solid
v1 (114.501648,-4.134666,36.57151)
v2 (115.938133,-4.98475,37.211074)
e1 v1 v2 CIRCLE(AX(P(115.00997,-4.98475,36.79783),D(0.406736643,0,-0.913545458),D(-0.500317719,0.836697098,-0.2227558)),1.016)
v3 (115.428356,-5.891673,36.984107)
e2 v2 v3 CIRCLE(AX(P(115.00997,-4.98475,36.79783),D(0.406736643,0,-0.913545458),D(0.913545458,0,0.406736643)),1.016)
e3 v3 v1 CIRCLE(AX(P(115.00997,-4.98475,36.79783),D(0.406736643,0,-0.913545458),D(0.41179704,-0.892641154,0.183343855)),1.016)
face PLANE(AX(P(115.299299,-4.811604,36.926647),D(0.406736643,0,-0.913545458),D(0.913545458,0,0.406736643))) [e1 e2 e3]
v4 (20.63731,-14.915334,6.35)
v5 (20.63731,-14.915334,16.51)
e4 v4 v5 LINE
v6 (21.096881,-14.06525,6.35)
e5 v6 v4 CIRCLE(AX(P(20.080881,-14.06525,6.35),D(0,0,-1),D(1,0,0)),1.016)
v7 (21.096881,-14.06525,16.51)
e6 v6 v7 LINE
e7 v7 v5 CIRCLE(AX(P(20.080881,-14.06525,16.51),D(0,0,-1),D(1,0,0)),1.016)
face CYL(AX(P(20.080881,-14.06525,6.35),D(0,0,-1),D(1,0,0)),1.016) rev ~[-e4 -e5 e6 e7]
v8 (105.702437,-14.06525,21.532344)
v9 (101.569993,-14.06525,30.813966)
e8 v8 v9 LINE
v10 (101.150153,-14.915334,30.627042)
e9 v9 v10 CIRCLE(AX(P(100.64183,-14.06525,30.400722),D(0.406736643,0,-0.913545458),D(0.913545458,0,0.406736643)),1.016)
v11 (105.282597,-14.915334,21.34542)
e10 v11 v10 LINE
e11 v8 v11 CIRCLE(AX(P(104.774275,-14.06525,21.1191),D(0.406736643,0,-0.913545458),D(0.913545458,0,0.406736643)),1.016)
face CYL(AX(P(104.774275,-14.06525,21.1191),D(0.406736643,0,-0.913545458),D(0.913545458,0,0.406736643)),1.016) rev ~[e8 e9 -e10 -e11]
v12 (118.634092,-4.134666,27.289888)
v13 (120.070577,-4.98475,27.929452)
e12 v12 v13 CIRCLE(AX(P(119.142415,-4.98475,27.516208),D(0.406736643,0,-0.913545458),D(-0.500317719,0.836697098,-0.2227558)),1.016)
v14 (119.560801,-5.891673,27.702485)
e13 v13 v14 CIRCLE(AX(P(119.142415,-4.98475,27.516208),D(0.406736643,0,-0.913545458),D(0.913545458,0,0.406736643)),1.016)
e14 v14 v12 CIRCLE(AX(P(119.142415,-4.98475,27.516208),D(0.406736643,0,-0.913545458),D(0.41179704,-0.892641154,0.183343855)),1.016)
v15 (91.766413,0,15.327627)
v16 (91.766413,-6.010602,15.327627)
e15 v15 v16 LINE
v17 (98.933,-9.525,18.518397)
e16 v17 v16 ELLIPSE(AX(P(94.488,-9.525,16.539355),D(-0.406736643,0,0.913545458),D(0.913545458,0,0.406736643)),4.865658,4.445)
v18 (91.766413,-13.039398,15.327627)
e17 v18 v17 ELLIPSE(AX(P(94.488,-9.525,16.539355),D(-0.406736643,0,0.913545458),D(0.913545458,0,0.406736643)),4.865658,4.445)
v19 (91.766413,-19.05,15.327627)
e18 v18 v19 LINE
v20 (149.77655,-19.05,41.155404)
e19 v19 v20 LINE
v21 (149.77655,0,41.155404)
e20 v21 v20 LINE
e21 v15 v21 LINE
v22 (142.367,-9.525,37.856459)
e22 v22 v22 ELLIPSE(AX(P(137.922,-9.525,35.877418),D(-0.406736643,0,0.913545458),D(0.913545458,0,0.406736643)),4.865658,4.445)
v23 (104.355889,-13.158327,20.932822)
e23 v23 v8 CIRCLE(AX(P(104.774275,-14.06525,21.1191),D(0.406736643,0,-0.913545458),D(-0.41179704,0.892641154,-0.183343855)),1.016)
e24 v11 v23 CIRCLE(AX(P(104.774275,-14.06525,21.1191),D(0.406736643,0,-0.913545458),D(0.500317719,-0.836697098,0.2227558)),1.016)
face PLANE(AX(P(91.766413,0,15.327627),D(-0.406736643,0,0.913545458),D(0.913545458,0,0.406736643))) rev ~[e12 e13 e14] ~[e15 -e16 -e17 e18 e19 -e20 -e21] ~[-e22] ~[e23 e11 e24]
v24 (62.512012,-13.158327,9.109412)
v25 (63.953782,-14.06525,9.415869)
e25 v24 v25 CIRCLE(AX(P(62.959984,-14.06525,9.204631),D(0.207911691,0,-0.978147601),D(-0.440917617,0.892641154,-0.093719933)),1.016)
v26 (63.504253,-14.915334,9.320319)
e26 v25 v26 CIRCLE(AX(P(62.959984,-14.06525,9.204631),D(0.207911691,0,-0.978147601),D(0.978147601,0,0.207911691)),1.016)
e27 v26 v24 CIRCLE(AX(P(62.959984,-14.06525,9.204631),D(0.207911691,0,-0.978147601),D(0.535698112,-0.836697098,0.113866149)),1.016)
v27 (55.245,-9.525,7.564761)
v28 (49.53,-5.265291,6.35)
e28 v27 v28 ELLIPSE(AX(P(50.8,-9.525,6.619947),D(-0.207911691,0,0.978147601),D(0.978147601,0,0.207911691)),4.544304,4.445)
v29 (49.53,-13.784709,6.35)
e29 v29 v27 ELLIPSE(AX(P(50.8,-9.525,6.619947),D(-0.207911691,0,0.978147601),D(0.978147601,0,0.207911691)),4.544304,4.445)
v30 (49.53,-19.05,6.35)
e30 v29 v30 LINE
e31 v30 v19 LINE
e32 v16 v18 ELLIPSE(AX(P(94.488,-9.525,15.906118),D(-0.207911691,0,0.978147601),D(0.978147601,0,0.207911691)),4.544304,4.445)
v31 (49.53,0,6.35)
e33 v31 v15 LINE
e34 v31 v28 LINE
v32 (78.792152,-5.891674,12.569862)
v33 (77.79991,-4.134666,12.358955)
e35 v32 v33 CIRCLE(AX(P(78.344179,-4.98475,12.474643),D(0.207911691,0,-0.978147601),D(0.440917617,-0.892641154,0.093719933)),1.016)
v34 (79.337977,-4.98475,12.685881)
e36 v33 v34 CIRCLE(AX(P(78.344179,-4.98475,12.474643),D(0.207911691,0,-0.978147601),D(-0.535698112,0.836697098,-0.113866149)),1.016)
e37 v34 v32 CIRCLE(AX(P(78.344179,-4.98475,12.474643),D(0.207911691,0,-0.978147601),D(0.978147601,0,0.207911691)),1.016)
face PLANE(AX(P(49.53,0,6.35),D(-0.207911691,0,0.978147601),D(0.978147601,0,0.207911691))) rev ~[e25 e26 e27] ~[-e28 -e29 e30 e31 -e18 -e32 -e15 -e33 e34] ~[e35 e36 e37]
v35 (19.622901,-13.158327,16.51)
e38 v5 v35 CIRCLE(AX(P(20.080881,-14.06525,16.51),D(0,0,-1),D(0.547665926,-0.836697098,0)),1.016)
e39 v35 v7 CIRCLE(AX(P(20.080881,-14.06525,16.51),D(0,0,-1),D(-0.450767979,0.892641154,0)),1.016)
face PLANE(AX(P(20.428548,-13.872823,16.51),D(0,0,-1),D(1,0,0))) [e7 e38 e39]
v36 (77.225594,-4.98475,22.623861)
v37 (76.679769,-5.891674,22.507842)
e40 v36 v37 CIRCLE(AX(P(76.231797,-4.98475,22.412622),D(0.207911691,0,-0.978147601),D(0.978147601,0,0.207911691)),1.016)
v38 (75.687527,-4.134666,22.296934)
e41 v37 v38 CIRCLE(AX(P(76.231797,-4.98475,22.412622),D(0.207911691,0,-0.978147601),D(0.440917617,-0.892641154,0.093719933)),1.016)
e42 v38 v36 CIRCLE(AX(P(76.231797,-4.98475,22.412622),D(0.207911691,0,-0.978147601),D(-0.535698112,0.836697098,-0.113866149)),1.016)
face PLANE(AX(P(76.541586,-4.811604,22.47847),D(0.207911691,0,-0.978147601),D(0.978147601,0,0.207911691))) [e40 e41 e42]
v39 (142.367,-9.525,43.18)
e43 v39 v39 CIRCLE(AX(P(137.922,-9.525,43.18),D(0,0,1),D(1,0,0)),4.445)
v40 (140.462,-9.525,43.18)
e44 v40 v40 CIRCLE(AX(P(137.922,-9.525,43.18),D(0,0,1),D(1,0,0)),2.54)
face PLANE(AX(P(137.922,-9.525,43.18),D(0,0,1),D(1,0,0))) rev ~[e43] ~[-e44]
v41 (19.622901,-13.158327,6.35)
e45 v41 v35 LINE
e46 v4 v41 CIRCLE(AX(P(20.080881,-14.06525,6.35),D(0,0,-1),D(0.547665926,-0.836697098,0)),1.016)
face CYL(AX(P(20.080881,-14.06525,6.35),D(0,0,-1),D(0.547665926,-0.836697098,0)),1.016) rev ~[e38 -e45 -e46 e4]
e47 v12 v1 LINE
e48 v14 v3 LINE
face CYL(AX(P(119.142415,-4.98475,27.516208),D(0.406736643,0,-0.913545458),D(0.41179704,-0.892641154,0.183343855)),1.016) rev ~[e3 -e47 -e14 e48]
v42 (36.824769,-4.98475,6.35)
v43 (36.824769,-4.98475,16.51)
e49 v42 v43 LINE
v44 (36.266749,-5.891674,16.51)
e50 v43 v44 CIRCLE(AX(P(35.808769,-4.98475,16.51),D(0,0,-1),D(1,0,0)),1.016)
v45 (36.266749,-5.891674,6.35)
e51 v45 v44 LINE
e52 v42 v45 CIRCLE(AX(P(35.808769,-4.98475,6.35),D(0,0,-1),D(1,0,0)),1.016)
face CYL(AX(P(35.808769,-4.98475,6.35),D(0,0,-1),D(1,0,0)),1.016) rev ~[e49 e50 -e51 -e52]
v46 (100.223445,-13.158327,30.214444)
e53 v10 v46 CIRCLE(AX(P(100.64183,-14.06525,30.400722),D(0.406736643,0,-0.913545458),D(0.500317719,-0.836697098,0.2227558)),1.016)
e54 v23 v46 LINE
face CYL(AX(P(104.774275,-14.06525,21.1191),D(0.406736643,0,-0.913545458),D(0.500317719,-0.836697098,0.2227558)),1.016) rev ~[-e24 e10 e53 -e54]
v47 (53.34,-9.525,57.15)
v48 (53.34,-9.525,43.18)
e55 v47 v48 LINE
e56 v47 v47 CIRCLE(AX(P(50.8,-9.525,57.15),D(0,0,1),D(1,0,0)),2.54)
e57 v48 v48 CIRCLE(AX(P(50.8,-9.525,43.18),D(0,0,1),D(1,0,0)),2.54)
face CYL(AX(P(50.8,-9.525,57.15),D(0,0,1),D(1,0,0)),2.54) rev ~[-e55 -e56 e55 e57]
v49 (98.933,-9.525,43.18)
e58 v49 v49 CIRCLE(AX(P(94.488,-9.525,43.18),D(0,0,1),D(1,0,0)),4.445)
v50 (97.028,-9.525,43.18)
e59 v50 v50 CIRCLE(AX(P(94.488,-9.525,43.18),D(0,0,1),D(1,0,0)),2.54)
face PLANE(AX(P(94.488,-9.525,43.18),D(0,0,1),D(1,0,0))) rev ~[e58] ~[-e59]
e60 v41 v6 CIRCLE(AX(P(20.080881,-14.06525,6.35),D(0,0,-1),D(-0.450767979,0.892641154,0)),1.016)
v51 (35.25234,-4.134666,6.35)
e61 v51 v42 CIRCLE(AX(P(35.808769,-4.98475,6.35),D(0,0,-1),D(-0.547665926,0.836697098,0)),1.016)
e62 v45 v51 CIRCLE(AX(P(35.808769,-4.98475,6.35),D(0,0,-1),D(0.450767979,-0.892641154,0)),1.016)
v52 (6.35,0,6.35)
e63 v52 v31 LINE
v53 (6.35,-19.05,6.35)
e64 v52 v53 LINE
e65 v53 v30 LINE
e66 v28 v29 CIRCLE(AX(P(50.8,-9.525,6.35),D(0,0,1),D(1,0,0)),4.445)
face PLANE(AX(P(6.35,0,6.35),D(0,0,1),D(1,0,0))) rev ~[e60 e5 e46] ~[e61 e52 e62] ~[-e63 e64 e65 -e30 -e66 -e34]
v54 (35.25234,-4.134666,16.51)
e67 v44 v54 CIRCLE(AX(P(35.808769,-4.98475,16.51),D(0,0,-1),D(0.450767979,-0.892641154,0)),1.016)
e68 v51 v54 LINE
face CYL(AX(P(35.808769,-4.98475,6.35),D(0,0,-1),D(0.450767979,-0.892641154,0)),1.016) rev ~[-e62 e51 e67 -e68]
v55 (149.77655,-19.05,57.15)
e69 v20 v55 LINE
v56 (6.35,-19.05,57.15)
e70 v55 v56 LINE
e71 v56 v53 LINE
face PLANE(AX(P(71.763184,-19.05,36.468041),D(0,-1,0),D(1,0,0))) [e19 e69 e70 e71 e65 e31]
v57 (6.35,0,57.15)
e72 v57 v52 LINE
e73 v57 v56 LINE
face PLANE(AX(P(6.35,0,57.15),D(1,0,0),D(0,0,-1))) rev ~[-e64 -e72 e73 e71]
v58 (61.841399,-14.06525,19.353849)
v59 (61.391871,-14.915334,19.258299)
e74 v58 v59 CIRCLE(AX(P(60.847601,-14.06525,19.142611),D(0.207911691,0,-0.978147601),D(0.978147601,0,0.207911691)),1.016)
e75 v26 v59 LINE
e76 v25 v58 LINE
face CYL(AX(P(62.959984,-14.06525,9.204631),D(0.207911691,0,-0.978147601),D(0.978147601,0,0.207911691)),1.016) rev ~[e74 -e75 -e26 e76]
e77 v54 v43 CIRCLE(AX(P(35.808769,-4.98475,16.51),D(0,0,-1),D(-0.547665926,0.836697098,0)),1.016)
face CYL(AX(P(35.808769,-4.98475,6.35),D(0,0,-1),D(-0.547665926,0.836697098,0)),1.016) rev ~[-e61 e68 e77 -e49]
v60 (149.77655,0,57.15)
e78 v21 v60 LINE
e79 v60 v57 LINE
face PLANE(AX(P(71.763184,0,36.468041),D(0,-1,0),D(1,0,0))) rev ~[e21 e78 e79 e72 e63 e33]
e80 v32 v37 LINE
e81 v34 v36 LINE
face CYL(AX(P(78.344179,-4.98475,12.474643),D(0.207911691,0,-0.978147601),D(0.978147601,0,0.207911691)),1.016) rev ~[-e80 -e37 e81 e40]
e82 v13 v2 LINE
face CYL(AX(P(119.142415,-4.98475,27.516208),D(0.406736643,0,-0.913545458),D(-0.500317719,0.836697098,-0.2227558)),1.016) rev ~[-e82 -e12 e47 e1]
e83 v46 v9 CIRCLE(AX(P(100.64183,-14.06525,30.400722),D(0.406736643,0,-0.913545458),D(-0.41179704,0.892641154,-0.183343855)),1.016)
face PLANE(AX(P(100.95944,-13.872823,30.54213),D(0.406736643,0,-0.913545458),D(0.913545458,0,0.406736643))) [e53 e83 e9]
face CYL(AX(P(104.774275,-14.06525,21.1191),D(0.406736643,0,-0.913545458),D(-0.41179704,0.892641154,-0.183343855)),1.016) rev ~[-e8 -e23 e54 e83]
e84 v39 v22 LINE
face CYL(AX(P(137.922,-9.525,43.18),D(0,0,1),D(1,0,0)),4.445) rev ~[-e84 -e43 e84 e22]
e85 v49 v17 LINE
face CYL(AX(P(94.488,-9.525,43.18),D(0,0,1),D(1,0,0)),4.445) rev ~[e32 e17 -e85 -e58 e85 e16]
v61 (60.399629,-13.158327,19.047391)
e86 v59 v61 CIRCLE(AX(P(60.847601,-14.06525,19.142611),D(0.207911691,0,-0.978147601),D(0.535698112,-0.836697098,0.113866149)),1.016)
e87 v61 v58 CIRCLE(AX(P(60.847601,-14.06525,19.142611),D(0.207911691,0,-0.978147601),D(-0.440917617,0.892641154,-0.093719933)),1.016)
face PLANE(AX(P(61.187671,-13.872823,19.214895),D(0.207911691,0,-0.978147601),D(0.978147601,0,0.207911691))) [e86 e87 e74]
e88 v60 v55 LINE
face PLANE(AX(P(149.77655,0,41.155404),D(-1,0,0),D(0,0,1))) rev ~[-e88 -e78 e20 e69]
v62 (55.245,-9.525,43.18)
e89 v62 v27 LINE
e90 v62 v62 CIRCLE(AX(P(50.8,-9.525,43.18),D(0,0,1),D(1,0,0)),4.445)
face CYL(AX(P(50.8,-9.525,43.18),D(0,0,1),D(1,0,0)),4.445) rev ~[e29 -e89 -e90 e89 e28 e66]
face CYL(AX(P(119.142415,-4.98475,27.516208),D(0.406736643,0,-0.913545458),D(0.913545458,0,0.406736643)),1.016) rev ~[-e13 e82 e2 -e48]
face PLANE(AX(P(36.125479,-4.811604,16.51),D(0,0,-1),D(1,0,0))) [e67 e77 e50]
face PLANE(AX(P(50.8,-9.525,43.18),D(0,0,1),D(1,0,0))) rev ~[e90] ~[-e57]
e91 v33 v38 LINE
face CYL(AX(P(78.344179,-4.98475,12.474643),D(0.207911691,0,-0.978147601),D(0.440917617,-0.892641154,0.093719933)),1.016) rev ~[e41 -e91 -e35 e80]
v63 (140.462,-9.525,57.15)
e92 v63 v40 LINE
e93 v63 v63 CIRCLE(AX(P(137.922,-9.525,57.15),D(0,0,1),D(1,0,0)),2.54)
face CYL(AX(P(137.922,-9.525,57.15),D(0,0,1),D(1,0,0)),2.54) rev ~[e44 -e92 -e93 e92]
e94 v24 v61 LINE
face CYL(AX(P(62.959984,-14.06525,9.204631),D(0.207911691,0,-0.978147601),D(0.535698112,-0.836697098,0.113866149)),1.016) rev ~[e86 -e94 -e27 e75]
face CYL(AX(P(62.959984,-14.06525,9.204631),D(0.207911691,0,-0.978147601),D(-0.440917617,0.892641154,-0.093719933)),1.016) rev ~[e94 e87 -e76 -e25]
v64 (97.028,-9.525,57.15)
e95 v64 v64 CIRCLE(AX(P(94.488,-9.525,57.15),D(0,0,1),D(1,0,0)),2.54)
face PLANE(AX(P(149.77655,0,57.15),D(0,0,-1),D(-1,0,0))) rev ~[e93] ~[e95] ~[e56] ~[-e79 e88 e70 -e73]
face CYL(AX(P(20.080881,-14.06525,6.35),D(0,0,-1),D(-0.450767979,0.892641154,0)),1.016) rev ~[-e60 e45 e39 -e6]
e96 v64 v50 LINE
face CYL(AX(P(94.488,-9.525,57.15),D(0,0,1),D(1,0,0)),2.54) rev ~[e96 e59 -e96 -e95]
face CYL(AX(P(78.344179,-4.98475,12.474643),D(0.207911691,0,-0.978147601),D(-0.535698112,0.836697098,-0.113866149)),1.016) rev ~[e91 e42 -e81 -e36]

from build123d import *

# Parameters (mm, degrees)
F1_DEPTH  = 19.05
F2_R      = 2.54
F3_DEPTH  = 50.801
F4_START  = -13.97
F2_R_2    = 4.445
F4_DEPTH  = 40.386
F6_DEPTH  = 10.16
F8_DEPTH  = 10.16
F10_DEPTH = 10.16


with BuildPart() as f1:
    # F0 (on Front) → F1 (new body)
    with BuildSketch(Plane.XZ):
        Polygon((149.77654996, 57.15), (6.35, 57.15), (6.35, 6.35), (49.53, 6.35), (91.7664133997, 15.3276268095), (149.77654996, 41.1554036448), align=None)
    extrude(amount=F1_DEPTH)

    # F2 (on face) → F3 (cut, through all)
    with BuildSketch(Plane.XY.offset(57.15)):
        with Locations((50.8, -9.525)):
            Circle(F2_R)
        with Locations((94.488, -9.525)):
            Circle(F2_R)
        with Locations((137.922, -9.525)):
            Circle(F2_R)
    extrude(amount=-F3_DEPTH, mode=Mode.SUBTRACT)

    # F2 (on face) → F4 (cut)
    with BuildSketch(Plane.XY.offset(57.15).offset(F4_START)):
        with Locations((50.8, -9.525)):
            Circle(F2_R_2)
        with Locations((50.8, -9.525)):
            Circle(F2_R, mode=Mode.SUBTRACT)
        with Locations((94.488, -9.525)):
            Circle(F2_R_2)
        with Locations((94.488, -9.525)):
            Circle(F2_R, mode=Mode.SUBTRACT)
        with Locations((137.922, -9.525)):
            Circle(F2_R_2)
        with Locations((137.922, -9.525)):
            Circle(F2_R, mode=Mode.SUBTRACT)
    extrude(amount=-F4_DEPTH, mode=Mode.SUBTRACT)

    # F5 (on face) → F6 (cut)
    with BuildSketch(Plane(origin=(0, 0, 6.35), x_dir=(1, 0, 0), z_dir=(0, 0, -1))):
        with BuildLine():
            ThreePointArc((21.0968814449, 14.0652501177), (20.97463405, 14.5484294642), (20.6373100259, 14.915334369))
            ThreePointArc((20.6373100259, 14.915334369), (20.0808814449, 14.0652501177), (19.6229011784, 13.1583267056))
            ThreePointArc((19.6229011784, 13.1583267056), (20.6133042324, 13.1999282265), (21.0968814449, 14.0652501177))
        make_face()
        with BuildLine():
            ThreePointArc((19.6229011784, 13.1583267056), (20.0808814449, 14.0652501177), (20.6373100259, 14.915334369))
            ThreePointArc((20.6373100259, 14.915334369), (19.2009996347, 14.5732501177), (19.6229011784, 13.1583267056))
        make_face()
        with BuildLine():
            ThreePointArc((36.8247688031, 4.9847501177), (36.6740906943, 5.5171729052), (36.2667490696, 5.8916735299))
            ThreePointArc((36.2667490696, 5.8916735299), (35.8087688031, 4.9847501177), (35.2523402221, 4.1346658664))
            ThreePointArc((35.2523402221, 4.1346658664), (36.2919481496, 4.0909975126), (36.8247688031, 4.9847501177))
        make_face()
        with BuildLine():
            ThreePointArc((35.2523402221, 4.1346658664), (35.8087688031, 4.9847501177), (36.2667490696, 5.8916735299))
            ThreePointArc((36.2667490696, 5.8916735299), (34.9288869928, 5.4927501177), (35.2523402221, 4.1346658664))
        make_face()
    extrude(amount=-F6_DEPTH, mode=Mode.SUBTRACT)

    # F7 (on face) → F8 (cut)
    with BuildSketch(Plane(origin=(0.8496578997, 0, -3.9973261378), x_dir=(0.9781476007, 0, 0.2079116908), z_dir=(0.2079116908, 0, -0.9781476007))):
        with BuildLine():
            ThreePointArc((64.5139077337, 14.0652501177), (64.3916603388, 14.5484294642), (64.0543363147, 14.915334369))
            ThreePointArc((64.0543363147, 14.915334369), (63.4979077337, 14.0652501177), (63.0399274672, 13.1583267056))
            ThreePointArc((63.0399274672, 13.1583267056), (64.0303305212, 13.1999282265), (64.5139077337, 14.0652501177))
        make_face()
        with BuildLine():
            ThreePointArc((63.0399274672, 13.1583267056), (63.4979077337, 14.0652501177), (64.0543363147, 14.915334369))
            ThreePointArc((64.0543363147, 14.915334369), (62.6180259235, 14.5732501177), (63.0399274672, 13.1583267056))
        make_face()
        with BuildLine():
            ThreePointArc((80.2417950919, 4.9847501177), (80.0911169831, 5.5171729052), (79.6837753584, 5.8916735299))
            ThreePointArc((79.6837753584, 5.8916735299), (79.2257950919, 4.9847501177), (78.6693665109, 4.1346658664))
            ThreePointArc((78.6693665109, 4.1346658664), (79.7089744384, 4.0909975126), (80.2417950919, 4.9847501177))
        make_face()
        with BuildLine():
            ThreePointArc((78.6693665109, 4.1346658664), (79.2257950919, 4.9847501177), (79.6837753584, 5.8916735299))
            ThreePointArc((79.6837753584, 5.8916735299), (78.3459132816, 5.4927501177), (78.6693665109, 4.1346658664))
        make_face()
    extrude(amount=-F8_DEPTH, mode=Mode.SUBTRACT)

    # F9 (on face) → F10 (cut)
    with BuildSketch(Plane(origin=(9.4860255039, 0, -21.30596212), x_dir=(0.9135454576, 0, 0.4067366431), z_dir=(0.4067366431, 0, -0.9135454576))):
        with BuildLine():
            ThreePointArc((105.3219744595, 14.06525), (105.1997270646, 14.5484293465), (104.8624030404, 14.9153342513))
            ThreePointArc((104.8624030404, 14.9153342513), (104.3059744595, 14.06525), (103.847994193, 13.1583265879))
            ThreePointArc((103.847994193, 13.1583265879), (104.8383972469, 13.1999281088), (105.3219744595, 14.06525))
        make_face()
        with BuildLine():
            ThreePointArc((103.847994193, 13.1583265879), (104.3059744595, 14.06525), (104.8624030404, 14.9153342513))
            ThreePointArc((104.8624030404, 14.9153342513), (103.4260926492, 14.57325), (103.847994193, 13.1583265879))
        make_face()
        with BuildLine():
            ThreePointArc((121.0498618176, 4.98475), (120.8991837088, 5.5171727875), (120.4918420841, 5.8916734121))
            ThreePointArc((120.4918420841, 5.8916734121), (120.0338618176, 4.98475), (119.4774332367, 4.1346657487))
            ThreePointArc((119.4774332367, 4.1346657487), (120.5170411641, 4.0909973949), (121.0498618176, 4.98475))
        make_face()
        with BuildLine():
            ThreePointArc((119.4774332367, 4.1346657487), (120.0338618176, 4.98475), (120.4918420841, 5.8916734121))
            ThreePointArc((120.4918420841, 5.8916734121), (119.1539800074, 5.49275), (119.4774332367, 4.1346657487))
        make_face()
    extrude(amount=-F10_DEPTH, mode=Mode.SUBTRACT)


solid = f1.part
